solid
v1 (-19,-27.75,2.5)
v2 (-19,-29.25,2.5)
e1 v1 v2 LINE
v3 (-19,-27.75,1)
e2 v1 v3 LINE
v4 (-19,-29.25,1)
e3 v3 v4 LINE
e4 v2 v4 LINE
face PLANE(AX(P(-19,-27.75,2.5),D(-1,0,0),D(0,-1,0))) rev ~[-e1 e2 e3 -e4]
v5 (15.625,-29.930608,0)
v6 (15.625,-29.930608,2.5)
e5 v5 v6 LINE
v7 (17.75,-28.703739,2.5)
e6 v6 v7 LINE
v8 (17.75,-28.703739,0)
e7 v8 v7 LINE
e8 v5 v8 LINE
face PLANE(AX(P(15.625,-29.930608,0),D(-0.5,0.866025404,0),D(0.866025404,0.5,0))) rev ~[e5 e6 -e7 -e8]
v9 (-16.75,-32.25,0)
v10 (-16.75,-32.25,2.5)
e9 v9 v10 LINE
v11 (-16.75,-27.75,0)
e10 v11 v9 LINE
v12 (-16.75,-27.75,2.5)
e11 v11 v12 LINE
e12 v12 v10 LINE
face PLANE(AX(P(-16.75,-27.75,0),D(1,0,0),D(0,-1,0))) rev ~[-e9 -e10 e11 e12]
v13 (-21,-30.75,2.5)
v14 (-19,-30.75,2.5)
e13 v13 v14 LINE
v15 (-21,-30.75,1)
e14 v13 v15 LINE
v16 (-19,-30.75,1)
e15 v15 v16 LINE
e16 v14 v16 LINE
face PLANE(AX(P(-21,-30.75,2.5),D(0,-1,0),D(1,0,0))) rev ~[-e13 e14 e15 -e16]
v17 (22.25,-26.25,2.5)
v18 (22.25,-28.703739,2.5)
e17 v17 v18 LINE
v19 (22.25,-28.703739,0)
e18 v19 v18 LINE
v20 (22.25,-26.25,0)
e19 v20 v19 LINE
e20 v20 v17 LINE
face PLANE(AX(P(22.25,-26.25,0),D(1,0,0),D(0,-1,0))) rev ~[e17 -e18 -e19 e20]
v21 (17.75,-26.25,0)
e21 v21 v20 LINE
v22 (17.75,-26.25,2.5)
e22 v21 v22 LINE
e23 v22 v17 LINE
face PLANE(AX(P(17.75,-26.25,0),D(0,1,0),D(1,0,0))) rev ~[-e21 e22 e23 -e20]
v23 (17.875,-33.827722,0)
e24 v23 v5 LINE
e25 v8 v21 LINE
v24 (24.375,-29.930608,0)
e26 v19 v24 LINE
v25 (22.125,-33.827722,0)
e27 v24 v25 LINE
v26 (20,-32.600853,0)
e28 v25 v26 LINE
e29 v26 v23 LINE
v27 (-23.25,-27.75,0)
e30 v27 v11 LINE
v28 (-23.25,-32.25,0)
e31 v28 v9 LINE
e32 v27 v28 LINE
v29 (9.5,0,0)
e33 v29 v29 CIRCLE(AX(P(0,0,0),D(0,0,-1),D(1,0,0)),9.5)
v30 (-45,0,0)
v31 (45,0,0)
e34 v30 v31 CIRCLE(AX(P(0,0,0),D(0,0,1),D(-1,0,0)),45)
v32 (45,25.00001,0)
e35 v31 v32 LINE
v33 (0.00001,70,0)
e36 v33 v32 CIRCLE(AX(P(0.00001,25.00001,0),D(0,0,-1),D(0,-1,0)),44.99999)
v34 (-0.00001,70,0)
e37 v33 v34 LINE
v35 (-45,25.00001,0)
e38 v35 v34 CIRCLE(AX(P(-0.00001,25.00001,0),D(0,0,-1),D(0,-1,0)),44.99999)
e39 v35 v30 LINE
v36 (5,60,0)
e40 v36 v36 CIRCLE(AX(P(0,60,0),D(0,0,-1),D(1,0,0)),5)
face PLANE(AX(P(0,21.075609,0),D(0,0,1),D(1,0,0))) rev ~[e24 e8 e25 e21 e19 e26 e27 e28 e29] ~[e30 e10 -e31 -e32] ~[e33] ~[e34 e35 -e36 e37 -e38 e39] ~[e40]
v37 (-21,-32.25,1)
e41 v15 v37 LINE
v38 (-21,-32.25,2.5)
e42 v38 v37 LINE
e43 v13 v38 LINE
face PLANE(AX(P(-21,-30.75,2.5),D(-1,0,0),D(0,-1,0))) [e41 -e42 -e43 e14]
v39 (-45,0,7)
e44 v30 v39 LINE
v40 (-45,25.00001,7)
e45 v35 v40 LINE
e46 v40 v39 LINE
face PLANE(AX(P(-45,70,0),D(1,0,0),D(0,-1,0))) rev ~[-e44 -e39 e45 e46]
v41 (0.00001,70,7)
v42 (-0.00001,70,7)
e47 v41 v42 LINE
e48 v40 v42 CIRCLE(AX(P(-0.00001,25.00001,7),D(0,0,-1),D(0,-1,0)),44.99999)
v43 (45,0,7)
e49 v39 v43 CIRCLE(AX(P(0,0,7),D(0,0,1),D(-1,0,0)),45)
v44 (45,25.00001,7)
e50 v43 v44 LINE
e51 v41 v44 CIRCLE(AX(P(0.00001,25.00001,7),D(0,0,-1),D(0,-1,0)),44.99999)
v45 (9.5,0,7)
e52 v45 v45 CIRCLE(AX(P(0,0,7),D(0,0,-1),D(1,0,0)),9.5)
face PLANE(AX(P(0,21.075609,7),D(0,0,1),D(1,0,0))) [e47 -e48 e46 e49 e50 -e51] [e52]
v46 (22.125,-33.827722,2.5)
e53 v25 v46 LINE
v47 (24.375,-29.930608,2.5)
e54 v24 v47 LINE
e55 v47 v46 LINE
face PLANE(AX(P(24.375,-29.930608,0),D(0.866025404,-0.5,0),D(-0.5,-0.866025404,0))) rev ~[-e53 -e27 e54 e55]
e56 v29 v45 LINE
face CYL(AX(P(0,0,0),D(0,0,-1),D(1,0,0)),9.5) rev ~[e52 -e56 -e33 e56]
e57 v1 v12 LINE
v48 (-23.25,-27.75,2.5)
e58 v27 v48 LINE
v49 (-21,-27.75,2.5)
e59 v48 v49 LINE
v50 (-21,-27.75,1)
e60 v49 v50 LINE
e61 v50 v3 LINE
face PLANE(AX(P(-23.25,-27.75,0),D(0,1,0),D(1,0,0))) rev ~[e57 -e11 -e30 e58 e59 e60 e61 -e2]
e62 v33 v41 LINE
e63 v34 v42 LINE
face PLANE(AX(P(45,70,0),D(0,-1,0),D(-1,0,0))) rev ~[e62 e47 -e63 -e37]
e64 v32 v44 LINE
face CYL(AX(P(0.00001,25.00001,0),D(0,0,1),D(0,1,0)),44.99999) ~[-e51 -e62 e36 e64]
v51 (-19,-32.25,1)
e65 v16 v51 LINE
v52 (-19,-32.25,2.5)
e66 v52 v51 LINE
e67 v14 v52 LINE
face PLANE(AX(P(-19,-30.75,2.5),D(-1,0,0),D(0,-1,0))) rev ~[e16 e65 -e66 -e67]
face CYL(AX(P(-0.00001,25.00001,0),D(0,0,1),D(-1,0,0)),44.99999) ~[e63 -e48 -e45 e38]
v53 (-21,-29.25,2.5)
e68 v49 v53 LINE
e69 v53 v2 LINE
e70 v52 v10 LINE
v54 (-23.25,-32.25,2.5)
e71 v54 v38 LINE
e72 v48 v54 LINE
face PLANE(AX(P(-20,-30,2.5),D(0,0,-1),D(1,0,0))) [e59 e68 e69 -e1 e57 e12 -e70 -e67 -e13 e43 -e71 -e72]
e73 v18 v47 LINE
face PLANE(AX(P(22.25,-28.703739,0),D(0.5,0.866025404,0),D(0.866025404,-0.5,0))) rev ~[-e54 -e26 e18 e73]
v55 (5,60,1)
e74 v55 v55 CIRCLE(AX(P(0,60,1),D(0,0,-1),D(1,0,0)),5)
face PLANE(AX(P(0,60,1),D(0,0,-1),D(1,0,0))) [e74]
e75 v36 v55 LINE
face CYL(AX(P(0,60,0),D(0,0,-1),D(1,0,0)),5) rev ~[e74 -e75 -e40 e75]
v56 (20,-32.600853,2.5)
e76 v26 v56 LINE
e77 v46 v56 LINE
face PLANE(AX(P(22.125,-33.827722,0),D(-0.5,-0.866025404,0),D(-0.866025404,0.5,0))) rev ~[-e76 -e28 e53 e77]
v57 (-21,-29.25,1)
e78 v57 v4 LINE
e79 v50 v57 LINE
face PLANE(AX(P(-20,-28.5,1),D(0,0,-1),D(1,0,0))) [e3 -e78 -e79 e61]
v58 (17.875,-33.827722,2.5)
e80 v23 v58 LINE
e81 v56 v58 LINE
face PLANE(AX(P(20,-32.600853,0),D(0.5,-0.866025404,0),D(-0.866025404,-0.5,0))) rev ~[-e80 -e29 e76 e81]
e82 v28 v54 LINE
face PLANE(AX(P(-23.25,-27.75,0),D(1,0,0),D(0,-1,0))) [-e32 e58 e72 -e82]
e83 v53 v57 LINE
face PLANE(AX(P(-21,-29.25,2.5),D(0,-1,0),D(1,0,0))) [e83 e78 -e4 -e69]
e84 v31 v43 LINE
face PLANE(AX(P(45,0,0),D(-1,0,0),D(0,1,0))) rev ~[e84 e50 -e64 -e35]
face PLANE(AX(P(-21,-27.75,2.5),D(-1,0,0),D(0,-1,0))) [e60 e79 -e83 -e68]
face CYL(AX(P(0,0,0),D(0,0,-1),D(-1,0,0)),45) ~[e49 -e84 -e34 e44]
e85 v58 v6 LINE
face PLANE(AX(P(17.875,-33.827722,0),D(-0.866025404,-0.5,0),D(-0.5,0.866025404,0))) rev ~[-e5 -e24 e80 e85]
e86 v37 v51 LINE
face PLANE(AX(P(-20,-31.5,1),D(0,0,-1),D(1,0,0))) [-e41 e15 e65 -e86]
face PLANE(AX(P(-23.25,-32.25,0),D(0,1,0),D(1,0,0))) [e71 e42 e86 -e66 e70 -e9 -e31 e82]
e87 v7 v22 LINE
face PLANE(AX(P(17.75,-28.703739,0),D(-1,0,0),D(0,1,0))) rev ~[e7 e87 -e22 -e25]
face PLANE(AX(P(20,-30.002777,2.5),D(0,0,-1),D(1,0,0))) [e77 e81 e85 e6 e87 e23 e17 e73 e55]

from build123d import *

# Parameters (mm, degrees)
F1_DEPTH  = 7
F2_R      = 9.5
F3_DEPTH  = 10
F6_DEPTH  = 2.5
F4_R      = 5
F7_DEPTH  = 1
F8_W      = 6.5
F8_H      = 4.5
F9_DEPTH  = 2.5
F10_W     = 2
F10_H     = 1.5
F11_DEPTH = 1.5
F12_R     = 44.99999


# Not quite as in the source:
# - a fillet or chamfer is up to 0.001 mm smaller than in the source, because OpenCascade refuses the exact size


with BuildPart() as f1:
    # F0 (on Top) → F1 (new body)
    with BuildSketch(Plane.XY):
        with BuildLine():
            Line((-45, 70), (-45, 0))
            ThreePointArc((-45, 0), (0, -45), (45, 0))
            Line((45, 0), (45, 70))
            Line((45, 70), (-45, 70))
        make_face()
    extrude(amount=F1_DEPTH)

    # F2 (on face) → F3 (cut)
    with BuildSketch(Plane(origin=(0, 0, 0), x_dir=(1, 0, 0), z_dir=(0, 0, -1))):
        Circle(F2_R)
    extrude(amount=-F3_DEPTH, mode=Mode.SUBTRACT)

    # F5 (on face) → F6 (cut)
    with BuildSketch(Plane(origin=(0, 0, 0), x_dir=(1, 0, 0), z_dir=(0, 0, -1))):
        Polygon((20, 32.6008529611), (17.875, 33.8277222831), (15.625, 29.9306079661), (17.75, 28.7037386441), (17.75, 26.25), (22.25, 26.25), (22.25, 28.7037386441), (24.375, 29.9306079661), (22.125, 33.8277222831), align=None)
    extrude(amount=-F6_DEPTH, mode=Mode.SUBTRACT)

    # F4 (on face) → F7 (cut)
    with BuildSketch(Plane(origin=(0, 0, 0), x_dir=(1, 0, 0), z_dir=(0, 0, -1))):
        with Locations((0, -60)):
            Circle(F4_R)
    extrude(amount=-F7_DEPTH, mode=Mode.SUBTRACT)

    # F8 (on face) → F9 (cut)
    with BuildSketch(Plane(origin=(0, 0, 0), x_dir=(1, 0, 0), z_dir=(0, 0, -1))):
        with Locations((-20, 30)):
            Rectangle(F8_W, F8_H)
    extrude(amount=-F9_DEPTH, mode=Mode.SUBTRACT)

    # F10 (on face) → F11 (join)
    with BuildSketch(Plane(origin=(0, 0, 2.5), x_dir=(1, 0, 0), z_dir=(0, 0, -1))):
        with Locations((-20, 31.5)):
            Rectangle(F10_W, F10_H)
        with Locations((-20, 28.5)):
            Rectangle(F10_W, F10_H)
    extrude(amount=F11_DEPTH)

    # F12 (radius 45 in the source; OpenCascade refuses exactly that, so slightly less here)
    f12_edges = [f1.edges().sort_by_distance(p)[0] for p in [
        (-45, 70, 3.5),
        (45, 70, 3.5),
    ]]
    fillet(f12_edges, radius=F12_R)


solid = f1.part
